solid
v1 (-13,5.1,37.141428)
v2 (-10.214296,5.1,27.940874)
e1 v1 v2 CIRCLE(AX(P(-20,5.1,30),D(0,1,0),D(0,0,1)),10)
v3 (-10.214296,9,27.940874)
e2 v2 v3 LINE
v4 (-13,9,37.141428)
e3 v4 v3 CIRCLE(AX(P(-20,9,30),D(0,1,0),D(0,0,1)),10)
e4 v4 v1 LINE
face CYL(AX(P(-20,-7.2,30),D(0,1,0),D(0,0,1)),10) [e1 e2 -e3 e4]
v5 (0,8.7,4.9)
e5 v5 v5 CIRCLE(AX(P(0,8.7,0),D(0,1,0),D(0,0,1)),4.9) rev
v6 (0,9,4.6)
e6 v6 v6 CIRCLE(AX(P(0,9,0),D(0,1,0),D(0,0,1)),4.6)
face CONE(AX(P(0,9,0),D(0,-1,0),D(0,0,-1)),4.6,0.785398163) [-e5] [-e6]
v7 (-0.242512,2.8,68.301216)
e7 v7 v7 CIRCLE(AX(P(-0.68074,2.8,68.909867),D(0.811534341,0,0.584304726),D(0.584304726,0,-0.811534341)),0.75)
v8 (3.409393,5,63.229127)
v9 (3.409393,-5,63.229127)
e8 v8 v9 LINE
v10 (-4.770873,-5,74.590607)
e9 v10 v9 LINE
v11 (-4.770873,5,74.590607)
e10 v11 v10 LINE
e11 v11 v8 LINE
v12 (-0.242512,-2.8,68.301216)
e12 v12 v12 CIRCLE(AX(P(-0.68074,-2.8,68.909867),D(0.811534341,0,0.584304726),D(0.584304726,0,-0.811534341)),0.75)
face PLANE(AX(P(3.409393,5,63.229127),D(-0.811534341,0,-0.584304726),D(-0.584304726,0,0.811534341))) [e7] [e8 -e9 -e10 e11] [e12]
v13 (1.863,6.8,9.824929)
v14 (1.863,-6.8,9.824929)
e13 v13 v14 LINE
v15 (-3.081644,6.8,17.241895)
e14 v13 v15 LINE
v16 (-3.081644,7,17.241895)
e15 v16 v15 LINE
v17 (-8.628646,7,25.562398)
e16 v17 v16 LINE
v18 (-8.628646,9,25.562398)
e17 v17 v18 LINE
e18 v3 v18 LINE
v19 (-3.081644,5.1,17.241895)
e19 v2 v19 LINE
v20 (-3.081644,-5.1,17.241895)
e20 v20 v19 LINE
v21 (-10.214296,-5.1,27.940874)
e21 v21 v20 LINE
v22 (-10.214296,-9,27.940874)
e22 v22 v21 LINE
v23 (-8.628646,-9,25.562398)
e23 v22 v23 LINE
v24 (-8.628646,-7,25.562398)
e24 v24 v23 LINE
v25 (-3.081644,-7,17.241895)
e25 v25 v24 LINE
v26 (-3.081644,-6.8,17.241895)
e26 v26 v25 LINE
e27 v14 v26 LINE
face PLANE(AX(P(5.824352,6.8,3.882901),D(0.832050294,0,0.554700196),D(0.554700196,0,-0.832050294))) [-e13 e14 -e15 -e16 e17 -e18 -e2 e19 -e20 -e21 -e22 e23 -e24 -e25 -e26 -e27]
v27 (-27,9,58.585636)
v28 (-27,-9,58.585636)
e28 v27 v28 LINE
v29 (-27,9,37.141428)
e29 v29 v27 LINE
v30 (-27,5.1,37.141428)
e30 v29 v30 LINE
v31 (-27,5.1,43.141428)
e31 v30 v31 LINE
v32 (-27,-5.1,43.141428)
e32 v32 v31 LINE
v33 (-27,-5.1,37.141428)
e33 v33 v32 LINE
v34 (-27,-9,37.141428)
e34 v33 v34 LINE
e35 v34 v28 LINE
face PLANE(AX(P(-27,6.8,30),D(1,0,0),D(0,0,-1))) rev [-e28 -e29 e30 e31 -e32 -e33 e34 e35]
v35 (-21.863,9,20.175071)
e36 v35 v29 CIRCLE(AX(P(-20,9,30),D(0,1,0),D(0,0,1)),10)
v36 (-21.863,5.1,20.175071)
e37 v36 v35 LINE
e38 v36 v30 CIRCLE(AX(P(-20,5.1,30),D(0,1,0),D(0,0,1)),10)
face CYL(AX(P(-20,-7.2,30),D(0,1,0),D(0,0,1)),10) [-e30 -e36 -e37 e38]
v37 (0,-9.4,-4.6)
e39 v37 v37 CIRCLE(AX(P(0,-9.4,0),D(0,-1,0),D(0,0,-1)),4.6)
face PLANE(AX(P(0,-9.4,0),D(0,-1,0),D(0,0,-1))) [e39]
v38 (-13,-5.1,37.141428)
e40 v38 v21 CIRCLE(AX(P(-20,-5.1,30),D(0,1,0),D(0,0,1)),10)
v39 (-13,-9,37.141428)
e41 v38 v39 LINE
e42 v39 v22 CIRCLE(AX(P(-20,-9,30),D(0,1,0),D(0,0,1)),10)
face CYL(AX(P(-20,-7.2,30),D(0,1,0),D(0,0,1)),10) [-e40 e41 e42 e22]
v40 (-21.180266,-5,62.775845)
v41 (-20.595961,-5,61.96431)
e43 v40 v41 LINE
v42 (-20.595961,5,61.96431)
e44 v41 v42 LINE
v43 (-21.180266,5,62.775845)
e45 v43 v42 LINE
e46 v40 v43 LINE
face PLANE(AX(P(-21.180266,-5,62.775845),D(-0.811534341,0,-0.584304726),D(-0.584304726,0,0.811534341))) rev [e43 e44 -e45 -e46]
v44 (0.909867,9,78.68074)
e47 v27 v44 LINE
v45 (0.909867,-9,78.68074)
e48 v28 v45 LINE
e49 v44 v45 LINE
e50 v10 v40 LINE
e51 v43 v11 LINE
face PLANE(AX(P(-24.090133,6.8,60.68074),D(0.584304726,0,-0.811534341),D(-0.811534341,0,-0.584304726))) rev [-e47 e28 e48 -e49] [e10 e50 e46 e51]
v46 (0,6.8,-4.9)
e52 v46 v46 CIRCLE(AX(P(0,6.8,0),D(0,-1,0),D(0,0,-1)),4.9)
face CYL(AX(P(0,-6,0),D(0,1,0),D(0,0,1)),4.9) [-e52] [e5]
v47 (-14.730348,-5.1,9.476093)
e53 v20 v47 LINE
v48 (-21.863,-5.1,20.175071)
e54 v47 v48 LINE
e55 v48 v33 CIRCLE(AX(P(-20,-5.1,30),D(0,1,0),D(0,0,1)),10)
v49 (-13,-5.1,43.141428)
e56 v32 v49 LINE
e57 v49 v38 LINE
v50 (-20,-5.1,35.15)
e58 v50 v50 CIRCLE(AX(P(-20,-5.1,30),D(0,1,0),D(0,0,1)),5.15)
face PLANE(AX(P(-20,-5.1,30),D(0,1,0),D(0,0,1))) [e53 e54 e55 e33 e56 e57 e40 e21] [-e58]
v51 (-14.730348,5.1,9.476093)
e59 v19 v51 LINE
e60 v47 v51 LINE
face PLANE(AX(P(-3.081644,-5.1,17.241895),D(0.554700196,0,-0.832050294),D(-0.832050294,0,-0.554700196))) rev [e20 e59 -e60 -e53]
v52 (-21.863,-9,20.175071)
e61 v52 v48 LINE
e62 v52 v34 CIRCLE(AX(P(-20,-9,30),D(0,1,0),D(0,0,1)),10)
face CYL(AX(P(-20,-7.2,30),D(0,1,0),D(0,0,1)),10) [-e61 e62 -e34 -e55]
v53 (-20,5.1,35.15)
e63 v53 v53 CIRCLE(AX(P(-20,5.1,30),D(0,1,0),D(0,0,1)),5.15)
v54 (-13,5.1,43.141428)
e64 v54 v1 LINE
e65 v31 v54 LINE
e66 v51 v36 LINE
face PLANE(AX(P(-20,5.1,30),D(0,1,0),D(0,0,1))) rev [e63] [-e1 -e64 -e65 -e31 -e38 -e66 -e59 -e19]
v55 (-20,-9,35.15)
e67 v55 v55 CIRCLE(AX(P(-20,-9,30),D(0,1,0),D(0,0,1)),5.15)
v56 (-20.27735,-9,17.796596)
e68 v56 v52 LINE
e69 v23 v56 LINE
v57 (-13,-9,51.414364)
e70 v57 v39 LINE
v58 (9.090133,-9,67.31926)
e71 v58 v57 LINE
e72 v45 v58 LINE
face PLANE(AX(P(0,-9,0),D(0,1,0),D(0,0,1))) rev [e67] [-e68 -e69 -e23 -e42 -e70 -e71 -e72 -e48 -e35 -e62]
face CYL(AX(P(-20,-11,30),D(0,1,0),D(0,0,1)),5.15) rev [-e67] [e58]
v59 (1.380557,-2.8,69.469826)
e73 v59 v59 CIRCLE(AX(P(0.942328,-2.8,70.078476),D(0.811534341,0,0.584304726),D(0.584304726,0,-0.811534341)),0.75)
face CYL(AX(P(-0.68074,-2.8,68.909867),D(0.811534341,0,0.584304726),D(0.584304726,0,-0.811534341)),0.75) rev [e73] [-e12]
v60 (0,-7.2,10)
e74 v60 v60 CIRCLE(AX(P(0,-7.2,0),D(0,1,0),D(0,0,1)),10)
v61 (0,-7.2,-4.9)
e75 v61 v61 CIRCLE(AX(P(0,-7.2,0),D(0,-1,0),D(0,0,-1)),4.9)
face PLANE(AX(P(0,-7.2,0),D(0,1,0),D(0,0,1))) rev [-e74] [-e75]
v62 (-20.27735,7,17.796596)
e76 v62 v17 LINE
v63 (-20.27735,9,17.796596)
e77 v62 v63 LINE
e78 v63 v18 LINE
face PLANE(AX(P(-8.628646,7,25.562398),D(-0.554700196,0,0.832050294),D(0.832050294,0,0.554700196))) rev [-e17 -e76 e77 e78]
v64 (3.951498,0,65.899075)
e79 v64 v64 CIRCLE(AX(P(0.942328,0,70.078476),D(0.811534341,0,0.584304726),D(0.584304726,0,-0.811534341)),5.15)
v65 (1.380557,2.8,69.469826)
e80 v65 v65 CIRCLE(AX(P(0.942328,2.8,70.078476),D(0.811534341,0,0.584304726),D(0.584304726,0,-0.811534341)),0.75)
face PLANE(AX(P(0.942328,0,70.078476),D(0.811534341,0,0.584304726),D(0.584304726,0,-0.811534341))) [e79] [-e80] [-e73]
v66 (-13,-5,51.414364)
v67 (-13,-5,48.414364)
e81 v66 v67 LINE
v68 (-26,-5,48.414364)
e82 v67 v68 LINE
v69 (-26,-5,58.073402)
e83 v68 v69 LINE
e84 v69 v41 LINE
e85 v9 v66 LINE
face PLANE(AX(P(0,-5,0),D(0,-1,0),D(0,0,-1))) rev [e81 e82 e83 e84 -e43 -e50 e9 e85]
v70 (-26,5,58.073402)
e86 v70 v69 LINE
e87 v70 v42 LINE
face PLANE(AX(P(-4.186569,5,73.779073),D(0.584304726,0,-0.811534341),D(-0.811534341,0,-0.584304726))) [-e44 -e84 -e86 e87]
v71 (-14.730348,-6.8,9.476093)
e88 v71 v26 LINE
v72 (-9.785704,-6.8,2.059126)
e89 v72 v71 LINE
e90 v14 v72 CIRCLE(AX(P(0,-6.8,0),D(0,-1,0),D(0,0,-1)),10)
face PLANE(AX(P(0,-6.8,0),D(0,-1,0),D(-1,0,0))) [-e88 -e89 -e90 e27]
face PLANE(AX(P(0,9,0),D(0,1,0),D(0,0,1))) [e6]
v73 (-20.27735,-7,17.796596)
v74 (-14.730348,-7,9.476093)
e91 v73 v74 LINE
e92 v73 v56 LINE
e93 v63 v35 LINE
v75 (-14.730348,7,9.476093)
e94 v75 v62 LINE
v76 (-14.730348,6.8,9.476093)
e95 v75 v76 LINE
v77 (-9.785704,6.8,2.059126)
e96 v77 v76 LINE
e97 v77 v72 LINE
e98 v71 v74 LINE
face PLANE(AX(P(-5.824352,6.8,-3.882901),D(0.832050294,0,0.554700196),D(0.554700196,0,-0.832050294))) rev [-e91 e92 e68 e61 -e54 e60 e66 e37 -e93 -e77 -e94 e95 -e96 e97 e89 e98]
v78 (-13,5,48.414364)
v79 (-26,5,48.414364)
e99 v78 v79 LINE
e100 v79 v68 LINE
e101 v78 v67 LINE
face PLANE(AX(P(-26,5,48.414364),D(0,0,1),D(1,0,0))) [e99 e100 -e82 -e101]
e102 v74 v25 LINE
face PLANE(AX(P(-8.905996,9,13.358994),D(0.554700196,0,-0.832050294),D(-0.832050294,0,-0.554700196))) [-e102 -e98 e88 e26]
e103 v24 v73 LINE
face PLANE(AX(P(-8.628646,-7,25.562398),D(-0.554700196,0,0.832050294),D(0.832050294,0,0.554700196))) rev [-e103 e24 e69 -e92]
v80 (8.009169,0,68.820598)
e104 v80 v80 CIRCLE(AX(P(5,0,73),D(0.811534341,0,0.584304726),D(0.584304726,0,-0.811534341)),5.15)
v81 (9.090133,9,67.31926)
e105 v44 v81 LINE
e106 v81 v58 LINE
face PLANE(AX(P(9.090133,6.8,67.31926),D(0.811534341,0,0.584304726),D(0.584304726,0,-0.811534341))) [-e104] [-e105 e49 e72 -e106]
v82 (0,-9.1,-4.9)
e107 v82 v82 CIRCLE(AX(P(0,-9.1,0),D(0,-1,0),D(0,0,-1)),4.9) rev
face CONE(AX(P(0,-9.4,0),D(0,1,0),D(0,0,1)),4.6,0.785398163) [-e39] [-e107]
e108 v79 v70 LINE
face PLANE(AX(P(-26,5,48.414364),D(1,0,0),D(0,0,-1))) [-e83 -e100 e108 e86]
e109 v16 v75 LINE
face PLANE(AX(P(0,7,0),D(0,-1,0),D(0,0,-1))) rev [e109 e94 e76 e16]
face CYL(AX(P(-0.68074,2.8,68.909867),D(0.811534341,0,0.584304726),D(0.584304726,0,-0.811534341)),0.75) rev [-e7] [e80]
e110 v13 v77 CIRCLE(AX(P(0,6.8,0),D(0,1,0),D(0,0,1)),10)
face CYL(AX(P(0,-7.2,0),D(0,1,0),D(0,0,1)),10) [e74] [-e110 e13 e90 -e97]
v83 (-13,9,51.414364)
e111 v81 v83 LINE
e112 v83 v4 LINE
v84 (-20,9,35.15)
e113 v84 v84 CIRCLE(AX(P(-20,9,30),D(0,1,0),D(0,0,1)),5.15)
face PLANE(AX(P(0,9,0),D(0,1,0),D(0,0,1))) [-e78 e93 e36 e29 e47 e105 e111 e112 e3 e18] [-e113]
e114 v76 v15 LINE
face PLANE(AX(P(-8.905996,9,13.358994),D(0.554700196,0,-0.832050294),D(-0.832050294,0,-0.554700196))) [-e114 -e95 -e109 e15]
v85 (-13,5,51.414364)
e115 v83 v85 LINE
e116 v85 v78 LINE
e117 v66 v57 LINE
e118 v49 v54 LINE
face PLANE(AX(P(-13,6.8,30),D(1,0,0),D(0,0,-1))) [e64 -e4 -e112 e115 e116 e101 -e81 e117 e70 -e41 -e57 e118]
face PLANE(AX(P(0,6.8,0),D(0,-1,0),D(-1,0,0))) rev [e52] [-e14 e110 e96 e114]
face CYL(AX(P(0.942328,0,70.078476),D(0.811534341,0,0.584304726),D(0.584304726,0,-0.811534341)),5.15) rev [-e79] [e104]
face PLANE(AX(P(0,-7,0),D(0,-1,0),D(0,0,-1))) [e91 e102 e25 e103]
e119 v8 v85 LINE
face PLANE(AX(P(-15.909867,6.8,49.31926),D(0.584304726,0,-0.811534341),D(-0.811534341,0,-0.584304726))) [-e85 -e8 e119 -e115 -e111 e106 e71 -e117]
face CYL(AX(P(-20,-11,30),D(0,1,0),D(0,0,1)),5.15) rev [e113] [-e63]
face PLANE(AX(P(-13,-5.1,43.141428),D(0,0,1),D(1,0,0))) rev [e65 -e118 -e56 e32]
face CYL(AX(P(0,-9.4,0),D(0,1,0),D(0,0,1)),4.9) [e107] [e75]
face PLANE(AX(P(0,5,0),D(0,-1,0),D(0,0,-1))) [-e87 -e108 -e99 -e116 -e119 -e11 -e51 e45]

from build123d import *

# Parameters (mm, degrees)
EXTRUDE_1_DEPTH          = 6.8
SKETCH_2_R               = 10
EXTRUDE_1_2_DEPTH        = 14
EXTRUDE_2_DEPTH          = 9
CUT_EXTRUDE_1_DEPTH      = 5.1
SKETCH_5_R               = 4.9
EXTRUDE_3_DEPTH          = 15
SKETCH_6_R               = 5.15
CUT_EXTRUDE_5_DEPTH      = 20
CUT_EXTRUDE_8_DEPTH      = 5
CUT_EXTRUDE_8_DEPTH_BACK = 5
CUT_EXTRUDE_8_START      = -9
SKETCH_9_R               = 5.15
CUT_EXTRUDE_9_DEPTH      = 5
SKETCH_11_R              = 0.75
CUT_EXTRUDE_10_DEPTH     = 2
CUT_EXTRUDE_11_DEPTH     = 2
CUT_EXTRUDE_12_DEPTH     = 2
SKETCH_7_W               = 20.220207393
SKETCH_7_H               = 10
CUT_EXTRUDE_14_DEPTH     = 14
CHAMFER_C0_3_SIZE        = 0.3
SKETCH_19_R              = 4.9
EXTRUDE_9_8_2_2_DEPTH    = 2.2
CHAMFER_C0_3_2_SIZE      = 0.3


with BuildPart() as part:
    # 草图1 → Extrude 1 (new, symmetric)
    with BuildSketch(Plane(origin=(0, 0, 0), x_dir=(1, 0, 0), z_dir=(0, 1, 0))):
        Polygon((-5.82435206, 3.882901374), (-27, -27.880570536), (-27, -58.585636208), (0.909866919, -78.68074039), (9.090133081, -67.31925961), (-13, -51.414363792), (-13, -32.119429464), (5.82435206, -3.882901374), align=None)
    extrude(amount=EXTRUDE_1_DEPTH, both=True)

    # 草图2 → Extrude 1 2 (add)
    with BuildSketch(Plane(origin=(0, 6.8, 0), x_dir=(1, 0, 0), z_dir=(0, 1, 0))):
        Circle(SKETCH_2_R)
        with Locations((-20, -30)):
            Circle(SKETCH_2_R)
    extrude(amount=-EXTRUDE_1_2_DEPTH)

    # 草图3 → 凸台-拉伸2 (add, symmetric)
    with BuildSketch(Plane(origin=(0, 0, 0), x_dir=(1, 0, 0), z_dir=(0, 1, 0))):
        with BuildLine():
            Line((-3.081644015, -17.241895487), (-14.730348136, -9.47609274))
            Line((-14.730348136, -9.47609274), (-21.86300031, -20.175071))
            ThreePointArc((-21.86300031, -20.175071), (-29.570920265, -27.102158513), (-27, -37.141428429))
            Line((-27, -37.141428429), (-27, -58.585636208))
            Line((-27, -58.585636208), (0.909866919, -78.68074039))
            Line((0.909866919, -78.68074039), (9.090133081, -67.31925961))
            Line((9.090133081, -67.31925961), (-13, -51.414363792))
            Line((-13, -51.414363792), (-13, -37.141428429))
            ThreePointArc((-13, -37.141428429), (-10.429079735, -32.897841487), (-10.214296189, -27.940873748))
            Line((-10.214296189, -27.940873748), (-3.081644015, -17.241895487))
        make_face()
    extrude(amount=EXTRUDE_2_DEPTH, both=True)

    # 草图4 → 切除-拉伸1 (cut, symmetric)
    with BuildSketch(Plane(origin=(0, 0, 0), x_dir=(1, 0, 0), z_dir=(0, 1, 0))):
        with BuildLine():
            Line((-13, -37.141428429), (-13, -43.141428429))
            Line((-13, -43.141428429), (-27, -43.141428429))
            Line((-27, -43.141428429), (-27, -37.141428429))
            ThreePointArc((-27, -37.141428429), (-29.570920265, -27.102158513), (-21.86300031, -20.175071))
            Line((-21.86300031, -20.175071), (-14.730348136, -9.47609274))
            Line((-14.730348136, -9.47609274), (-3.081644015, -17.241895487))
            Line((-3.081644015, -17.241895487), (-10.214296189, -27.940873748))
            ThreePointArc((-10.214296189, -27.940873748), (-10.429079735, -32.897841487), (-13, -37.141428429))
        make_face()
    extrude(amount=CUT_EXTRUDE_1_DEPTH, both=True, mode=Mode.SUBTRACT)

    # 草图5 → 凸台-拉伸3 (add)
    with BuildSketch(Plane(origin=(0, 9, 0), x_dir=(1, 0, 0), z_dir=(0, 1, 0))):
        Circle(SKETCH_5_R)
    extrude(amount=-EXTRUDE_3_DEPTH)

    # 草图6 → 切除-拉伸5 (cut)
    with BuildSketch(Plane(origin=(0, 9, 0), x_dir=(1, 0, 0), z_dir=(0, 1, 0))):
        with Locations((-20, -30)):
            Circle(SKETCH_6_R)
    extrude(amount=-CUT_EXTRUDE_5_DEPTH, mode=Mode.SUBTRACT)

    # 草图8 → 切除-拉伸8 (cut, two sides: drawn at the far end of the back side and taken through both)
    with BuildSketch(Plane(origin=(0, 9, 0), x_dir=(1, 0, 0), z_dir=(0, 1, 0)).offset(CUT_EXTRUDE_8_START - CUT_EXTRUDE_8_DEPTH_BACK)):
        Polygon((3.409392691, -63.229126529), (-4.186568745, -73.779072968), (-26, -58.073402464), (-26, -48.414363792), (-13, -48.414363792), (-13, -51.414363792), align=None)
    extrude(amount=CUT_EXTRUDE_8_DEPTH + CUT_EXTRUDE_8_DEPTH_BACK, mode=Mode.SUBTRACT)

    # 草图9 → 切除-拉伸9 (cut)
    with BuildSketch(Plane(origin=(37.908324552, 0, 27.293993678), x_dir=(0.5843047258450756, 0, -0.8115343414514946), z_dir=(0.8115343414514946, 0, 0.5843047258450756))):
        with Locations((-56.320483297, 0)):
            Circle(SKETCH_9_R)
    extrude(amount=-CUT_EXTRUDE_9_DEPTH, mode=Mode.SUBTRACT)

    # 草图11 → 切除-拉伸10 (cut)
    with BuildSketch(Plane(origin=(33.850652845, 0, 24.372470048), x_dir=(0.5843047258450756, 0, -0.8115343414514947), z_dir=(0.8115343414514947, 0, 0.5843047258450756))):
        with Locations((-56.320483297, 2.8)):
            Circle(SKETCH_11_R)
        with Locations((-56.320483297, -2.8)):
            Circle(SKETCH_11_R)
    extrude(amount=-CUT_EXTRUDE_10_DEPTH, mode=Mode.SUBTRACT)

    # 草图12 → 切除-拉伸11 (cut)
    with BuildSketch(Plane(origin=(0, 9, 0), x_dir=(1, 0, 0), z_dir=(0, 1, 0))):
        Polygon((-14.730348136, -9.47609274), (-3.081644015, -17.241895487), (-8.628645977, -25.56239843), (-20.277350098, -17.796595683), align=None)
    extrude(amount=-CUT_EXTRUDE_11_DEPTH, mode=Mode.SUBTRACT)

    # 草图13 → 切除-拉伸12 (cut)
    with BuildSketch(Plane.XZ.offset(9)):
        Polygon((-14.730348136, 9.47609274), (-3.081644015, 17.241895487), (-8.628645977, 25.56239843), (-20.277350098, 17.796595683), align=None)
    extrude(amount=-CUT_EXTRUDE_12_DEPTH, mode=Mode.SUBTRACT)

    # 草图7 → 切除-拉伸14 (cut)
    with BuildSketch(Plane(origin=(-28.818191471, 0, 40.025265932), x_dir=(-0.8115343414514946, 0, -0.5843047258450756), z_dir=(0.5843047258450756, 0, -0.8115343414514946))):
        with Locations((-29.601812998, 0)):
            Rectangle(SKETCH_7_W, SKETCH_7_H)
    extrude(amount=-CUT_EXTRUDE_14_DEPTH, mode=Mode.SUBTRACT)

    # Chamfer C0.3
    chamfer_c0_3_edges = [part.edges().sort_by_distance(p)[0] for p in [
        (-4.9, 9, 0),
    ]]
    chamfer(chamfer_c0_3_edges, length=CHAMFER_C0_3_SIZE)

    # 草图19 → 另一侧圆柱_直径9.8_外伸2.2 (add)
    with BuildSketch(Plane.XZ.offset(7.2)):
        Circle(SKETCH_19_R)
    extrude(amount=EXTRUDE_9_8_2_2_DEPTH)

    # Chamfer C0.3 2
    chamfer_c0_3_2_edges = [part.edges().sort_by_distance(p)[0] for p in [
        (-4.9, -9.4, 0),
    ]]
    chamfer(chamfer_c0_3_2_edges, length=CHAMFER_C0_3_2_SIZE)


solid = part.part
